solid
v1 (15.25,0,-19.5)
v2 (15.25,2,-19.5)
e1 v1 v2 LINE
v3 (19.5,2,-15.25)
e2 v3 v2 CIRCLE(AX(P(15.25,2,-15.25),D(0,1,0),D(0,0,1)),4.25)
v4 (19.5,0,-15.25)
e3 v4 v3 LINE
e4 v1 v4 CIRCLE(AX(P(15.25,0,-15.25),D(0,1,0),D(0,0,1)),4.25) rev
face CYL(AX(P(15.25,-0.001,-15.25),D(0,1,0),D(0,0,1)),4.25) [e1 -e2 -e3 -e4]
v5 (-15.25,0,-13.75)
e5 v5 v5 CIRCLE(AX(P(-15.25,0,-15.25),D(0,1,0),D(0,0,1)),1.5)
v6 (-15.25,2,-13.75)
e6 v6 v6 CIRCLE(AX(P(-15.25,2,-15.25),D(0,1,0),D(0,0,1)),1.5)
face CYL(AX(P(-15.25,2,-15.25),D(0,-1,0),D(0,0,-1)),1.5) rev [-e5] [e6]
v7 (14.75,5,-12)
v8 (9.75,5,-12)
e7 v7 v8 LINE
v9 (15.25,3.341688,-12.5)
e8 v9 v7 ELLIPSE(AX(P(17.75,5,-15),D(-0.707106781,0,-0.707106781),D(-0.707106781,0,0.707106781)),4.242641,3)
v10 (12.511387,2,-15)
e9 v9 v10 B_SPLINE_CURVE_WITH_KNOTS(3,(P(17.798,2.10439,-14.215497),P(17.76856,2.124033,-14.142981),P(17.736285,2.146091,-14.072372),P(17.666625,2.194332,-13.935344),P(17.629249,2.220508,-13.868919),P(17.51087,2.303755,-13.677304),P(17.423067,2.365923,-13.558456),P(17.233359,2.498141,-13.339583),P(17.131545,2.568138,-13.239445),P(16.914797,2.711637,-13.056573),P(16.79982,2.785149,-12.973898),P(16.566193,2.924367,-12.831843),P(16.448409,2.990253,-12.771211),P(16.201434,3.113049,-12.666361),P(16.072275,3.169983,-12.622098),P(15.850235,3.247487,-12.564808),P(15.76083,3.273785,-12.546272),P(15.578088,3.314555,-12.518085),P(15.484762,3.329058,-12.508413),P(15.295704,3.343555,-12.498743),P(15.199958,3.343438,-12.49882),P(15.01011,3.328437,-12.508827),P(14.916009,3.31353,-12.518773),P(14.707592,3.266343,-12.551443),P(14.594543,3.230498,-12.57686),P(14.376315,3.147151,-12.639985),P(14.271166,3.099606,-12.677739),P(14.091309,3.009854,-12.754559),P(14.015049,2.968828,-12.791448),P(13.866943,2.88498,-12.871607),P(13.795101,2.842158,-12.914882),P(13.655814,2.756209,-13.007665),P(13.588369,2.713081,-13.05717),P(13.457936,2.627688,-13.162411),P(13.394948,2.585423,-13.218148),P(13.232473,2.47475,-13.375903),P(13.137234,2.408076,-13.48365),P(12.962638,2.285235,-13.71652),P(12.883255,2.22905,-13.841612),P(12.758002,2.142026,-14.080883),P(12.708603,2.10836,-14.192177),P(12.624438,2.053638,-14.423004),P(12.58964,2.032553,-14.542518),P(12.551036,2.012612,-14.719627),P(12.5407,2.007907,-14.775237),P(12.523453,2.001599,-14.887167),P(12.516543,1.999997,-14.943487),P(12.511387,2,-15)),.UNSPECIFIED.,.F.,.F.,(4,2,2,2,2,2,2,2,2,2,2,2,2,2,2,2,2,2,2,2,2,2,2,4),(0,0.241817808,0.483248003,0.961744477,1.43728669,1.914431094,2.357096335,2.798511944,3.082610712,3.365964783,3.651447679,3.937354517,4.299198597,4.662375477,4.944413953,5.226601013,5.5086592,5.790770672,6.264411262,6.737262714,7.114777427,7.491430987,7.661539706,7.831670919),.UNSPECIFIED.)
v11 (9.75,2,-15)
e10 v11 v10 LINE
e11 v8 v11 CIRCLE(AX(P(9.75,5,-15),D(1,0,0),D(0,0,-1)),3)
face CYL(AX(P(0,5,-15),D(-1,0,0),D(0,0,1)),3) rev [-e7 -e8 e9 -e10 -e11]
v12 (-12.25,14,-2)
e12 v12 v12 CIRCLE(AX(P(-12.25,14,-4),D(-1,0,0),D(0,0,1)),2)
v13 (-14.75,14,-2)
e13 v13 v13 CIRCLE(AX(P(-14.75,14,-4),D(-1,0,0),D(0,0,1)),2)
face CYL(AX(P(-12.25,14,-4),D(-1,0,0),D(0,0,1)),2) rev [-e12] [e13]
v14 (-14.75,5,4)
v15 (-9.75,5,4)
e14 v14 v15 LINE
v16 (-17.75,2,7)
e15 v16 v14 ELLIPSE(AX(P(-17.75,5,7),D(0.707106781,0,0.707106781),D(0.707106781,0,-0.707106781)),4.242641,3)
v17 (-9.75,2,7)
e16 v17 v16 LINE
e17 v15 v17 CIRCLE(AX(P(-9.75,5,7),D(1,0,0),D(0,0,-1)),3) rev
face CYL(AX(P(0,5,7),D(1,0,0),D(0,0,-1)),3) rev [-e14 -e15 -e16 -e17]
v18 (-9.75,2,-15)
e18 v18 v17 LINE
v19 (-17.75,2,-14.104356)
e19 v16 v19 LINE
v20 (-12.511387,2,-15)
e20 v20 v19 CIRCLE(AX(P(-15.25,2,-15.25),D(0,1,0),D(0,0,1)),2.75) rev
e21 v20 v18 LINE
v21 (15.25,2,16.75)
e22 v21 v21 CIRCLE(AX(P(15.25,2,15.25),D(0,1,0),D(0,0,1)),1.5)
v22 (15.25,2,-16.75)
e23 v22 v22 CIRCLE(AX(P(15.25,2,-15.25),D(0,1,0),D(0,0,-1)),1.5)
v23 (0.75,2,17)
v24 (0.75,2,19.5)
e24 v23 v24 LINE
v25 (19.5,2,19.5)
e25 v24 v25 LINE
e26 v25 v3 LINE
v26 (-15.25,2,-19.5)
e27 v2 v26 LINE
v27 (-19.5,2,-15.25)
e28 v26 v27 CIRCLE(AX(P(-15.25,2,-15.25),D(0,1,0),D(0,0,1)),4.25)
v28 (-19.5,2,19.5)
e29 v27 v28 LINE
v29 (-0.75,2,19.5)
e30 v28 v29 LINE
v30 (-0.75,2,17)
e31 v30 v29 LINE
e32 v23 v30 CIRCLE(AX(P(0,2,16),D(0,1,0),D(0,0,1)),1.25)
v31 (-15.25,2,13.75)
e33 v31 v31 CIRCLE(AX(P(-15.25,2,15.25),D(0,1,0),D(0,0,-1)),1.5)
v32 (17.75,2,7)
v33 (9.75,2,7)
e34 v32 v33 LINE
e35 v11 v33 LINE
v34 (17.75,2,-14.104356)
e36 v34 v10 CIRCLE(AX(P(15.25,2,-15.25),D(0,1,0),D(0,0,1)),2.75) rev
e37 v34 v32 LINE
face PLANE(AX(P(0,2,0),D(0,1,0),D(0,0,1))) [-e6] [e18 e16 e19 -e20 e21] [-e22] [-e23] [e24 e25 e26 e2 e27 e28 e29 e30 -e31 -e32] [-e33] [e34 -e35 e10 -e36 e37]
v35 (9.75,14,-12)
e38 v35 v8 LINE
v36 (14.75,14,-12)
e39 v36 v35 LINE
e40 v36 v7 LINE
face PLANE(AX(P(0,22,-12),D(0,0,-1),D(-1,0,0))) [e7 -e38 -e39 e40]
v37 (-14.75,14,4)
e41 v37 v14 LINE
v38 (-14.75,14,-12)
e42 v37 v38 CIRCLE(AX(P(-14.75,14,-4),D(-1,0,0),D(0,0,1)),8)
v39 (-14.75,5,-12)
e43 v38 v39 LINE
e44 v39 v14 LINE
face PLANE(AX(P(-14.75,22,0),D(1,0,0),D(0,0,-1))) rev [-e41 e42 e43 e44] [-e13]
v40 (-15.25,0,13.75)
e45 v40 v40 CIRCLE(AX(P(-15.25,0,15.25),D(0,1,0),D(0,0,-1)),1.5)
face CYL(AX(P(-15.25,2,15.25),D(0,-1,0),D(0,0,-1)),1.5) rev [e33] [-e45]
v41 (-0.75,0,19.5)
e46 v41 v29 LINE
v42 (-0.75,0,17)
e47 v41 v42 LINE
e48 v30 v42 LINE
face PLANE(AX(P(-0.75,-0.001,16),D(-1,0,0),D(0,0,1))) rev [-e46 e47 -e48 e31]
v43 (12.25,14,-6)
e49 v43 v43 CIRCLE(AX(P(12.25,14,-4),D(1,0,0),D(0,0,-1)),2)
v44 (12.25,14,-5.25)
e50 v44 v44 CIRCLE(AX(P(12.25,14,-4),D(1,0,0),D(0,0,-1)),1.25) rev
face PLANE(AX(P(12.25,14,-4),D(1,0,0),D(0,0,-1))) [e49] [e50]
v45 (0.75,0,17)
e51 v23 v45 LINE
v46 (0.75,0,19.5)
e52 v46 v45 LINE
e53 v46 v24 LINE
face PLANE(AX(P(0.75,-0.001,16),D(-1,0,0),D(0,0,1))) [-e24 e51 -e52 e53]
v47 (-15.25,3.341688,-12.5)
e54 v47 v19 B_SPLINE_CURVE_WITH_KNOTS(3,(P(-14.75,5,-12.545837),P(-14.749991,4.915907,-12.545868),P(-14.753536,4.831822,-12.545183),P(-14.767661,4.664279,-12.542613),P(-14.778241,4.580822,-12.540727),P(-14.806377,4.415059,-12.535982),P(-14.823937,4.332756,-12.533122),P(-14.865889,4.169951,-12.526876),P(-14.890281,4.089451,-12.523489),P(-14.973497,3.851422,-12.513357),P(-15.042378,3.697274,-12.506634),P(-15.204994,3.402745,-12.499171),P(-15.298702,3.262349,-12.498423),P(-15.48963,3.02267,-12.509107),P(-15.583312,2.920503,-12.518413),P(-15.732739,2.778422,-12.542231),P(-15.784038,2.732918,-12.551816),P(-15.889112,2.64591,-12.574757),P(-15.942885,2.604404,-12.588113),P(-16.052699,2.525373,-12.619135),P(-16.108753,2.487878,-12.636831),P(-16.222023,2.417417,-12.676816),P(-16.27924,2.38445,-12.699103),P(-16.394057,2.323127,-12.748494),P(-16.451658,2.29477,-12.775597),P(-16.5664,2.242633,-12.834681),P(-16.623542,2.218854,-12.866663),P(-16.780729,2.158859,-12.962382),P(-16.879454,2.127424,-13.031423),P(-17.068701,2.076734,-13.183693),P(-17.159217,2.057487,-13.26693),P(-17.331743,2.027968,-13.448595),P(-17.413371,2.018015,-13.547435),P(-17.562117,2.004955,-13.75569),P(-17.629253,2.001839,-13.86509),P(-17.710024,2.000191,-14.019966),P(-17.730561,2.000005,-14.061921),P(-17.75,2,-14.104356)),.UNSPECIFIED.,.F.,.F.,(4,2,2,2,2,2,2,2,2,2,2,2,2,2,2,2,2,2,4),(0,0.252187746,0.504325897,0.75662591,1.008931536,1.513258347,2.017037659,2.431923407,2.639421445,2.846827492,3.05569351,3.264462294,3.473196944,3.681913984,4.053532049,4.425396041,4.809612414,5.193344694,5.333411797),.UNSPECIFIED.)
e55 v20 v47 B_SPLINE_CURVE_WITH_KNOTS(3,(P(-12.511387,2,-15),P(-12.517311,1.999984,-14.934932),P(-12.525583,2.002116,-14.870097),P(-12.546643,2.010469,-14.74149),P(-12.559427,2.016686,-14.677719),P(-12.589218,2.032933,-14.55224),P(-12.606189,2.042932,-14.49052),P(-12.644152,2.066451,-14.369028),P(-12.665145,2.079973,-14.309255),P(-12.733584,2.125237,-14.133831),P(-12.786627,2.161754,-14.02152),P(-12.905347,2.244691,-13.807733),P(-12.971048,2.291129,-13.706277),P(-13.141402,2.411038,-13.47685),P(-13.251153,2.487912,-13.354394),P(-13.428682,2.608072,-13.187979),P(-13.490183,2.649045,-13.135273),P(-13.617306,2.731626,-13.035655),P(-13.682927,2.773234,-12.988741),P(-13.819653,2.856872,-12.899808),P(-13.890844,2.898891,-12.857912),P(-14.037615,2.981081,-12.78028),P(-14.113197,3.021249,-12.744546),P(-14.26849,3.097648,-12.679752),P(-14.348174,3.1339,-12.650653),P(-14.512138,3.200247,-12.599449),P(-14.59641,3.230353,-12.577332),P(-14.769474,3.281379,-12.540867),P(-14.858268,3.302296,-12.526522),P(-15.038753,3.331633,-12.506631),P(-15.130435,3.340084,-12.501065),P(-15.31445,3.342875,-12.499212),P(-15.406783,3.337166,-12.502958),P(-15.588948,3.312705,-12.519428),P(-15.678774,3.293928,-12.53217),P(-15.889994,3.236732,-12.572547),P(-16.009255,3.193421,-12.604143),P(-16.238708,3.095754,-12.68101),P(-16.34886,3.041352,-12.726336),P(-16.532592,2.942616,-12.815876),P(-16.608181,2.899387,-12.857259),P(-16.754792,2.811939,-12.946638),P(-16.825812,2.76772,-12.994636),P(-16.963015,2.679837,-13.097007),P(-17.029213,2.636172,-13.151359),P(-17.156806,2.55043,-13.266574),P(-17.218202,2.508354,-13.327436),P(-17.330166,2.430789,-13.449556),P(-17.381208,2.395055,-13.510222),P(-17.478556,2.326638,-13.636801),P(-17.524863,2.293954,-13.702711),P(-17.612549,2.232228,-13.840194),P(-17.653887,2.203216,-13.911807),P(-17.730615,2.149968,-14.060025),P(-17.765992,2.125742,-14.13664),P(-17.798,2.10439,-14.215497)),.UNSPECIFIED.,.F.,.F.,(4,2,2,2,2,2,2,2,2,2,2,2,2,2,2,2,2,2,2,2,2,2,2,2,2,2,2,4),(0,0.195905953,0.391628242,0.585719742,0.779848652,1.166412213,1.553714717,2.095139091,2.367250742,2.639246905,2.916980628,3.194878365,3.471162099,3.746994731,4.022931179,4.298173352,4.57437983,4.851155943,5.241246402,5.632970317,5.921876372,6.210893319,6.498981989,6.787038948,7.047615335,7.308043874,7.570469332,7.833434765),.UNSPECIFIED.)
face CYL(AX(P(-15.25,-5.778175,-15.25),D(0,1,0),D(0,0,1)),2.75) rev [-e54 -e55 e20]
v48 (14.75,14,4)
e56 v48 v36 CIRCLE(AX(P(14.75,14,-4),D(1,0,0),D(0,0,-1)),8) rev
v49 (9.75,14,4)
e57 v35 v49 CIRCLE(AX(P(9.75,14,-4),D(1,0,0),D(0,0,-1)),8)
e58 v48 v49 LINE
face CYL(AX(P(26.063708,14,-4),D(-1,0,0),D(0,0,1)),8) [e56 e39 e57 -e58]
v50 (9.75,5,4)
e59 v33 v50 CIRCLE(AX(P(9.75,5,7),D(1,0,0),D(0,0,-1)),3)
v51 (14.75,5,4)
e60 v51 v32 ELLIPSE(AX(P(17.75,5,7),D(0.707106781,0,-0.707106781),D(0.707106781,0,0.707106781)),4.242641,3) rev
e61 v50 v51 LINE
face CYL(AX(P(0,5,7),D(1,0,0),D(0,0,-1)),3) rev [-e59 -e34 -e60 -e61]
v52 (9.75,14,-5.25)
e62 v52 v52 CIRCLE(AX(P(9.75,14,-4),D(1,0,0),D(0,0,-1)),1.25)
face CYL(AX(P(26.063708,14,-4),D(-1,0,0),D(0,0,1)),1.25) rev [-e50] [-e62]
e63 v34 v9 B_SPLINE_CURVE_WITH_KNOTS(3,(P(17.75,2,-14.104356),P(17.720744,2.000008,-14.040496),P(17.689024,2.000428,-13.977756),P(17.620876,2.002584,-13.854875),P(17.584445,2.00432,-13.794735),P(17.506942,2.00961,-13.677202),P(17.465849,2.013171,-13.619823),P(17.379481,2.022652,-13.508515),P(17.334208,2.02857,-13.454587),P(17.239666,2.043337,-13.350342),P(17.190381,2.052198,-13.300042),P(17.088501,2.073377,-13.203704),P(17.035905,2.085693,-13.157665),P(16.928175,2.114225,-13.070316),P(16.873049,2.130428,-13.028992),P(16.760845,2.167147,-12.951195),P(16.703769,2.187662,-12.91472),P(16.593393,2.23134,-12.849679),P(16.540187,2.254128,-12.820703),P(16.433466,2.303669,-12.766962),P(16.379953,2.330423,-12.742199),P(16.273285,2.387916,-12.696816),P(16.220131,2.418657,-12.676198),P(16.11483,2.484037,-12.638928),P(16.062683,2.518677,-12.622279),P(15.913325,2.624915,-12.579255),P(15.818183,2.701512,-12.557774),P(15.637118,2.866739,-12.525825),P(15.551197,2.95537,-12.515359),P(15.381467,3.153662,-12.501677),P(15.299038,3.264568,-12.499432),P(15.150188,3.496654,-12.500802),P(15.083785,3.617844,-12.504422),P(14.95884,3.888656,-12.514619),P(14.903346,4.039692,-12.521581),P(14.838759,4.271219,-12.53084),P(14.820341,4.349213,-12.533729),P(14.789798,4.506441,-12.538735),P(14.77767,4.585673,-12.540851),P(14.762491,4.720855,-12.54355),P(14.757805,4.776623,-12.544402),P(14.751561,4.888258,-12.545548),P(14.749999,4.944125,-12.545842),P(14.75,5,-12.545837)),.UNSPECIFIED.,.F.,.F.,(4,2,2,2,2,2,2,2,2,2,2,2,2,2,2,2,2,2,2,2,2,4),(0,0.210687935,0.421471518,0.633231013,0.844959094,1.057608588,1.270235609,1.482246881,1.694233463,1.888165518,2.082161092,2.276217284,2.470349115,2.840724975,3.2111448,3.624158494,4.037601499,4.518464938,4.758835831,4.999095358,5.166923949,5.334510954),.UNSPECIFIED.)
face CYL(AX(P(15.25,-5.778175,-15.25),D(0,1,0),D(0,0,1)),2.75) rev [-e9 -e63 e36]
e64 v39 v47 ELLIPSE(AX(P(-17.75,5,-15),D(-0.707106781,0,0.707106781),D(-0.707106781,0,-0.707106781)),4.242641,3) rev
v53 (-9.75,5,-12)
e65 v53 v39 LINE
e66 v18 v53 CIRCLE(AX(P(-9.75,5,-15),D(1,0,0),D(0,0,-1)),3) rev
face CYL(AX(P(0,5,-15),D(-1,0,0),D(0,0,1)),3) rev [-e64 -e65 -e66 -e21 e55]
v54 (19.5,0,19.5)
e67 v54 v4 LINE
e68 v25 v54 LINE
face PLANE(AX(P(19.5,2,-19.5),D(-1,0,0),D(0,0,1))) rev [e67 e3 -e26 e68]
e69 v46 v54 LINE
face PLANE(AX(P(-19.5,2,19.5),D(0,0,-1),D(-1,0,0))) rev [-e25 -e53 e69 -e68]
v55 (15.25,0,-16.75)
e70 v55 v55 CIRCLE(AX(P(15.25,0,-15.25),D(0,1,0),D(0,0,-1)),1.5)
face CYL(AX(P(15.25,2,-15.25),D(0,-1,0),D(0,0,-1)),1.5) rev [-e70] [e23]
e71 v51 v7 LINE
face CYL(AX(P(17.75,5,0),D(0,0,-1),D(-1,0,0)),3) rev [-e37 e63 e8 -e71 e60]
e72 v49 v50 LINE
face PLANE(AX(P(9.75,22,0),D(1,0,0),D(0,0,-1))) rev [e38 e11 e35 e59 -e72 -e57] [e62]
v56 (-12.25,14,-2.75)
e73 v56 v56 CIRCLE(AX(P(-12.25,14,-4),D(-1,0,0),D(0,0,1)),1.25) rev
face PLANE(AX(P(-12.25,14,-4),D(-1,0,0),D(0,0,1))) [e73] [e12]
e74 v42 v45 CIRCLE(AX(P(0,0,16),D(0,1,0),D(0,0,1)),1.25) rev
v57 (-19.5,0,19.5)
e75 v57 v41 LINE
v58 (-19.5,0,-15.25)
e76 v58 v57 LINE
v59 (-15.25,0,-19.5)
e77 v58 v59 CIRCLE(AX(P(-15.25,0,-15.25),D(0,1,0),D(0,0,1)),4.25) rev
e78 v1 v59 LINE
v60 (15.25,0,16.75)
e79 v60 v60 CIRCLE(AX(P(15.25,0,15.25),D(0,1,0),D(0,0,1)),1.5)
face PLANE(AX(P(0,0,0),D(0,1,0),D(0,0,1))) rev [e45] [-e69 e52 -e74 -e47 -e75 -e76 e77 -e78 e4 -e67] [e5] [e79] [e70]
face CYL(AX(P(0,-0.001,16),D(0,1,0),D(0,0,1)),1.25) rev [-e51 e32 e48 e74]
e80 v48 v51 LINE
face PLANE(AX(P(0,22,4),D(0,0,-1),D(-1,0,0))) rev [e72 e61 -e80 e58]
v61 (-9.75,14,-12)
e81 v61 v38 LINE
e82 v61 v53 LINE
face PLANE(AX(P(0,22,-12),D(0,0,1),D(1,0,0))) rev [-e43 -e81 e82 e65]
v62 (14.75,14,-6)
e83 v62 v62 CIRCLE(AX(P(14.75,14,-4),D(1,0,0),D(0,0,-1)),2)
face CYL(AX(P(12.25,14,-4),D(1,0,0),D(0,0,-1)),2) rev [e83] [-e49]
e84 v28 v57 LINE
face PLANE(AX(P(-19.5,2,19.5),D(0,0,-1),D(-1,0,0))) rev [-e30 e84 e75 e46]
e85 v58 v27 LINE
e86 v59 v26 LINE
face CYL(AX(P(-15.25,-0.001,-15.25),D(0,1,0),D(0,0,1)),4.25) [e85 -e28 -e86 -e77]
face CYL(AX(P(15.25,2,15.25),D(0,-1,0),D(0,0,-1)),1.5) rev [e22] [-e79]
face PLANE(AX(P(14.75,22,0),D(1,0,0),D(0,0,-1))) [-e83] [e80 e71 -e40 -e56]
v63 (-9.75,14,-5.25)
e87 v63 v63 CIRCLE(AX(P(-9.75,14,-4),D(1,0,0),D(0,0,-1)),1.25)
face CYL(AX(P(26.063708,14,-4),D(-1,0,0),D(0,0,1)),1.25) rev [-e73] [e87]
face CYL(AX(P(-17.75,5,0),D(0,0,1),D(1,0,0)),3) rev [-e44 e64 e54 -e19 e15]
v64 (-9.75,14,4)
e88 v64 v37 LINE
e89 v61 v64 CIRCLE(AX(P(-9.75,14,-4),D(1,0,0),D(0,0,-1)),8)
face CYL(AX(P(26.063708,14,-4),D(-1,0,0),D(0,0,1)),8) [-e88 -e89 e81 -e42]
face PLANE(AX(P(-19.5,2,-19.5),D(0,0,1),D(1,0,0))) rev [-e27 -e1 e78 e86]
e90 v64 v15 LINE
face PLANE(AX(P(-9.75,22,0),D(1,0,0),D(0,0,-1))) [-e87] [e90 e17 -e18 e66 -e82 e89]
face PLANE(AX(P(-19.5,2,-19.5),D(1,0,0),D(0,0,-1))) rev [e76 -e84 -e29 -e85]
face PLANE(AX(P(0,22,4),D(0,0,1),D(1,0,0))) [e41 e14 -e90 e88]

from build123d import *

# Parameters (mm, degrees)
SKETCH1_W           = 39
SKETCH1_H           = 39
SKETCH1_R           = 1.5
BOSS_EXTRUDE1_DEPTH = 2
SKETCH2_W           = 5
SKETCH2_H           = 16
BOSS_EXTRUDE2_DEPTH = 20
CUT_EXTRUDE1_REACH  = 47.137
SKETCH3_R           = 1.25
CUT_EXTRUDE2_REACH  = 36.066
SKETCH4_R           = 1.25
SKETCH4_W           = 1.5
SKETCH4_H           = 3.5
FILLET1_R           = 3
SKETCH6_R           = 2
CUT_EXTRUDE3_DEPTH  = 2.5
CUT_EXTRUDE4_START  = -2.5
SKETCH7_R           = 2
CUT_EXTRUDE4_DEPTH  = 2.5
SKETCH8_R           = 2.75
CUT_EXTRUDE5_DEPTH  = 20


with BuildPart() as part:
    # Sketch1 → Boss-Extrude1 (new body)
    with BuildSketch(Plane(origin=(0, 0, 0), x_dir=(1, 0, 0), z_dir=(0, 1, 0))):
        Rectangle(SKETCH1_W, SKETCH1_H)
        with Locations(Location((-15.25, 15.25, 0), (0, 0, 270))):
            Circle(SKETCH1_R, mode=Mode.SUBTRACT)
        with Locations(Location((15.25, 15.25, 0), (0, 0, 90))):
            Circle(SKETCH1_R, mode=Mode.SUBTRACT)
        with Locations(Location((15.25, -15.25, 0), (0, 0, 270))):
            Circle(SKETCH1_R, mode=Mode.SUBTRACT)
        with Locations(Location((-15.25, -15.25, 0), (0, 0, 90))):
            Circle(SKETCH1_R, mode=Mode.SUBTRACT)
    extrude(amount=BOSS_EXTRUDE1_DEPTH)

    # Sketch2 → Boss-Extrude2 (add)
    with BuildSketch(Plane(origin=(0, 2, 0), x_dir=(1, 0, 0), z_dir=(0, 1, 0))):
        with Locations((-12.25, 4)):
            Rectangle(SKETCH2_W, SKETCH2_H)
        with Locations((12.25, 4)):
            Rectangle(SKETCH2_W, SKETCH2_H)
    extrude(amount=BOSS_EXTRUDE2_DEPTH)

    # Cut-Extrude1: up to this face of the body (flat: up to its plane)
    cut_extrude1_end = Plane(part.part.faces().sort_by_distance((14.75, 12, -4))[0])
    # Sketch3 → Cut-Extrude1 (cut, up to the picked face)
    with BuildSketch(Plane.ZY.offset(14.75), mode=Mode.PRIVATE) as cut_extrude1_sk1:
        with BuildLine():
            Line((-12, 22), (-12, 14))
            ThreePointArc((-12, 14), (-9.656854249, 19.656854249), (-4, 22))
            Line((-4, 22), (-12, 22))
        make_face()
    cut_extrude1_tool1 = split(extrude(cut_extrude1_sk1.sketch, amount=-CUT_EXTRUDE1_REACH, mode=Mode.PRIVATE), bisect_by=cut_extrude1_end, keep=Keep.BOTH, mode=Mode.PRIVATE)
    # Sketch3 → Cut-Extrude1 (cut, up to the picked face)
    with BuildSketch(Plane.ZY.offset(14.75), mode=Mode.PRIVATE) as cut_extrude1_sk2:
        with BuildLine():
            ThreePointArc((-4, 22), (1.656854249, 19.656854249), (4, 14))
            Line((4, 14), (4, 22))
            Line((4, 22), (-4, 22))
        make_face()
    cut_extrude1_tool2 = split(extrude(cut_extrude1_sk2.sketch, amount=-CUT_EXTRUDE1_REACH, mode=Mode.PRIVATE), bisect_by=cut_extrude1_end, keep=Keep.BOTH, mode=Mode.PRIVATE)
    # Sketch3 → Cut-Extrude1 (cut, up to the picked face)
    with BuildSketch(Plane.ZY.offset(14.75), mode=Mode.PRIVATE) as cut_extrude1_sk3:
        with Locations(Location((-4, 14, 0), (0, 0, 180))):
            Circle(SKETCH3_R)
    cut_extrude1_tool3 = split(extrude(cut_extrude1_sk3.sketch, amount=-CUT_EXTRUDE1_REACH, mode=Mode.PRIVATE), bisect_by=cut_extrude1_end, keep=Keep.BOTH, mode=Mode.PRIVATE)
    add(cut_extrude1_tool1.solids().sort_by(Axis((-14.75, 20.213056, -10.213056), (1, 0, 0)))[0], mode=Mode.SUBTRACT)
    add(cut_extrude1_tool2.solids().sort_by(Axis((-14.75, 20.213056, 2.213056), (1, 0, 0)))[0], mode=Mode.SUBTRACT)
    add(cut_extrude1_tool3.solids().sort_by(Axis((-14.75, 14, -4), (1, 0, 0)))[0], mode=Mode.SUBTRACT)

    # Sketch4 → Cut-Extrude2 (cut, up to next)
    with BuildSketch(Plane(origin=(0, 2, 0), x_dir=(1, 0, 0), z_dir=(0, 1, 0)), mode=Mode.PRIVATE) as cut_extrude2_sk1:
        with BuildLine():
            Line((-19.5, 19.5), (-19.5, 15.25))
            ThreePointArc((-19.5, 15.25), (-18.25520382, 18.25520382), (-15.249999999, 19.5))
            Line((-15.249999999, 19.5), (-19.5, 19.5))
        make_face()
    cut_extrude2_tool1 = extrude(cut_extrude2_sk1.sketch, amount=-CUT_EXTRUDE2_REACH, mode=Mode.PRIVATE) & part.part
    # Sketch4 → Cut-Extrude2 (cut, up to next)
    with BuildSketch(Plane(origin=(0, 2, 0), x_dir=(1, 0, 0), z_dir=(0, 1, 0)), mode=Mode.PRIVATE) as cut_extrude2_sk2:
        with BuildLine():
            ThreePointArc((15.25, 19.5), (18.25520382, 18.25520382), (19.5, 15.25))
            Line((19.5, 15.25), (19.5, 19.5))
            Line((19.5, 19.5), (15.25, 19.5))
        make_face()
    cut_extrude2_tool2 = extrude(cut_extrude2_sk2.sketch, amount=-CUT_EXTRUDE2_REACH, mode=Mode.PRIVATE) & part.part
    # Sketch4 → Cut-Extrude2 (cut, up to next)
    with BuildSketch(Plane(origin=(0, 2, 0), x_dir=(1, 0, 0), z_dir=(0, 1, 0)), mode=Mode.PRIVATE) as cut_extrude2_sk3:
        with Locations((0, -16)):
            Circle(SKETCH4_R)
    cut_extrude2_tool3 = extrude(cut_extrude2_sk3.sketch, amount=-CUT_EXTRUDE2_REACH, mode=Mode.PRIVATE) & part.part
    # Sketch4 → Cut-Extrude2 (cut, up to next)
    with BuildSketch(Plane(origin=(0, 2, 0), x_dir=(1, 0, 0), z_dir=(0, 1, 0)), mode=Mode.PRIVATE) as cut_extrude2_sk4:
        with Locations((0, -17.75)):
            Rectangle(SKETCH4_W, SKETCH4_H)
    cut_extrude2_tool4 = extrude(cut_extrude2_sk4.sketch, amount=-CUT_EXTRUDE2_REACH, mode=Mode.PRIVATE) & part.part
    add(cut_extrude2_tool1.solids().sort_by_distance((-18.550686, 2, -18.550686))[0], mode=Mode.SUBTRACT)
    add(cut_extrude2_tool2.solids().sort_by_distance((18.550686, 2, -18.550686))[0], mode=Mode.SUBTRACT)
    add(cut_extrude2_tool3.solids().sort_by_distance((0, 2, 16))[0], mode=Mode.SUBTRACT)
    add(cut_extrude2_tool4.solids().sort_by_distance((0, 2, 17.75))[0], mode=Mode.SUBTRACT)

    # Fillet1
    # the kernel refuses this fillet: 3 mm, written as the material it adds along each edge
    with BuildSketch(Plane(origin=(-9.75, 2, -12), x_dir=(0, 0, -1), z_dir=(-1, 0, 0))) as fillet1_piece_1_section:
        with BuildLine():
            CenterArc((FILLET1_R, -FILLET1_R), FILLET1_R, 90, 90)
            Line((0, -FILLET1_R), (0, 0))
            Line((0, 0), (FILLET1_R, 0))
        make_face()
    fillet1_piece_1 = extrude(amount=5, mode=Mode.PRIVATE)
    fillet1_piece_1 = fillet1_piece_1 - Plane(origin=(-15.25, 2.68425546, -15.25), x_dir=(0, 0, 1), z_dir=(0, -1, 0)) * Cylinder(1.5, 23, mode=Mode.PRIVATE)
    add(fillet1_piece_1)
    with BuildSketch(Plane(origin=(-14.75, 2, -12), x_dir=(-1, 0, 0), z_dir=(0, 0, 1))) as fillet1_piece_2:
        with BuildLine():
            CenterArc((FILLET1_R, -FILLET1_R), FILLET1_R, 90, 90)
            Line((0, -FILLET1_R), (0, 0))
            Line((0, 0), (FILLET1_R, 0))
        make_face()
    extrude(amount=16)
    with BuildSketch(Plane(origin=(-14.75, 2, 4), x_dir=(0, 0, 1), z_dir=(1, 0, 0))) as fillet1_piece_3:
        with BuildLine():
            CenterArc((FILLET1_R, -FILLET1_R), FILLET1_R, 90, 90)
            Line((0, -FILLET1_R), (0, 0))
            Line((0, 0), (FILLET1_R, 0))
        make_face()
    extrude(amount=5)
    with BuildSketch(Plane(origin=(14.75, 2, 4), x_dir=(0, 0, 1), z_dir=(-1, 0, 0))) as fillet1_piece_4:
        with BuildLine():
            CenterArc((FILLET1_R, FILLET1_R), FILLET1_R, 180, 90)
            Line((0, FILLET1_R), (0, 0))
            Line((0, 0), (FILLET1_R, 0))
        make_face()
    extrude(amount=5)
    with BuildSketch(Plane(origin=(14.75, 2, -12), x_dir=(1, 0, 0), z_dir=(0, 0, 1))) as fillet1_piece_5:
        with BuildLine():
            CenterArc((FILLET1_R, FILLET1_R), FILLET1_R, 180, 90)
            Line((0, FILLET1_R), (0, 0))
            Line((0, 0), (FILLET1_R, 0))
        make_face()
    extrude(amount=16)
    with BuildSketch(Plane(origin=(9.75, 2, -12), x_dir=(0, 0, -1), z_dir=(1, 0, 0))) as fillet1_piece_6_section:
        with BuildLine():
            CenterArc((FILLET1_R, FILLET1_R), FILLET1_R, 180, 90)
            Line((0, FILLET1_R), (0, 0))
            Line((0, 0), (FILLET1_R, 0))
        make_face()
    fillet1_piece_6 = extrude(amount=5, mode=Mode.PRIVATE)
    fillet1_piece_6 = fillet1_piece_6 - Plane(origin=(15.25, 2.684255461, -15.25), x_dir=(0, 0, -1), z_dir=(0, -1, 0)) * Cylinder(1.5, 22, mode=Mode.PRIVATE)
    add(fillet1_piece_6)
    with BuildSketch(Plane(origin=(-9.75, 2, -12), x_dir=(0, 0, -1), z_dir=(-1, 0, 0))) as fillet1_piece_7a_section:
        with BuildLine():
            CenterArc((FILLET1_R, -FILLET1_R), FILLET1_R, 90, 90)
            Line((0, -FILLET1_R), (0, 0))
            Line((0, 0), (FILLET1_R, 0))
        make_face()
    fillet1_piece_7a = extrude(amount=12.5, mode=Mode.PRIVATE)
    fillet1_piece_7a = split(fillet1_piece_7a, bisect_by=Plane(origin=(-19.5, 2.695389127, -12.63970839), z_dir=(1, 0, 0)), keep=Keep.TOP, mode=Mode.PRIVATE)
    fillet1_piece_7a = fillet1_piece_7a - Plane(origin=(-15.25, 2.695389127, -15.25), x_dir=(0, 0, 1), z_dir=(0, -1, 0)) * Cylinder(1.5, 37, mode=Mode.PRIVATE)
    fillet1_piece_7a = split(fillet1_piece_7a, bisect_by=Plane(origin=(-14.75, 2.695389127, -12.63970839), z_dir=(-1, 0, 0)), keep=Keep.TOP, mode=Mode.PRIVATE)
    with BuildSketch(Plane(origin=(-14.75, 2, -19.5), x_dir=(-1, 0, 0), z_dir=(0, 0, 1))) as fillet1_piece_7b_section:
        with BuildLine():
            CenterArc((FILLET1_R, -FILLET1_R), FILLET1_R, 90, 90)
            Line((0, -FILLET1_R), (0, 0))
            Line((0, 0), (FILLET1_R, 0))
        make_face()
    fillet1_piece_7b = extrude(amount=23.5, mode=Mode.PRIVATE)
    fillet1_piece_7b = fillet1_piece_7b & Plane(origin=(-15.25, 2.080720084, -15.25), x_dir=(-1, 0, 0), z_dir=(0, 1, 0)) * Cylinder(4.25, 59, mode=Mode.PRIVATE)
    fillet1_piece_7b = fillet1_piece_7b - Plane(origin=(-15.25, 2.080720084, -15.25), x_dir=(0, 0, 1), z_dir=(0, -1, 0)) * Cylinder(1.5, 59, mode=Mode.PRIVATE)
    fillet1_piece_7b = split(fillet1_piece_7b, bisect_by=Plane(origin=(-16.967781304, 2.080720084, -12), z_dir=(0, 0, -1)), keep=Keep.TOP, mode=Mode.PRIVATE)
    fillet1_piece_7 = fillet1_piece_7a & fillet1_piece_7b
    add(fillet1_piece_7)
    with BuildSketch(Plane(origin=(-22.25, 2, 4), x_dir=(0, 0, 1), z_dir=(1, 0, 0))) as fillet1_piece_8a_section:
        with BuildLine():
            CenterArc((FILLET1_R, -FILLET1_R), FILLET1_R, 90, 90)
            Line((0, -FILLET1_R), (0, 0))
            Line((0, 0), (FILLET1_R, 0))
        make_face()
    fillet1_piece_8a = extrude(amount=12.5, mode=Mode.PRIVATE)
    fillet1_piece_8a = split(fillet1_piece_8a, bisect_by=Plane(origin=(-19.5, 2.679185343, 4.679185343), z_dir=(1, 0, 0)), keep=Keep.TOP, mode=Mode.PRIVATE)
    fillet1_piece_8a = split(fillet1_piece_8a, bisect_by=Plane(origin=(-14.75, 2.679185343, 4.679185343), z_dir=(-1, 0, 0)), keep=Keep.TOP, mode=Mode.PRIVATE)
    with BuildSketch(Plane(origin=(-14.75, 2, -12), x_dir=(-1, 0, 0), z_dir=(0, 0, 1))) as fillet1_piece_8b_section:
        with BuildLine():
            CenterArc((FILLET1_R, -FILLET1_R), FILLET1_R, 90, 90)
            Line((0, -FILLET1_R), (0, 0))
            Line((0, 0), (FILLET1_R, 0))
        make_face()
    fillet1_piece_8b = extrude(amount=23.5, mode=Mode.PRIVATE)
    fillet1_piece_8b = split(fillet1_piece_8b, bisect_by=Plane(origin=(-15.429185343, 2.679185343, 4), z_dir=(0, 0, 1)), keep=Keep.TOP, mode=Mode.PRIVATE)
    fillet1_piece_8 = fillet1_piece_8a & fillet1_piece_8b
    add(fillet1_piece_8)
    with BuildSketch(Plane(origin=(14.75, 2, -12), x_dir=(1, 0, 0), z_dir=(0, 0, 1))) as fillet1_piece_9a_section:
        with BuildLine():
            CenterArc((FILLET1_R, FILLET1_R), FILLET1_R, 180, 90)
            Line((0, FILLET1_R), (0, 0))
            Line((0, 0), (FILLET1_R, 0))
        make_face()
    fillet1_piece_9a = extrude(amount=23.5, mode=Mode.PRIVATE)
    fillet1_piece_9a = split(fillet1_piece_9a, bisect_by=Plane(origin=(15.429185343, 2.679185343, 4), z_dir=(0, 0, 1)), keep=Keep.TOP, mode=Mode.PRIVATE)
    with BuildSketch(Plane(origin=(22.25, 2, 4), x_dir=(0, 0, 1), z_dir=(-1, 0, 0))) as fillet1_piece_9b_section:
        with BuildLine():
            CenterArc((FILLET1_R, FILLET1_R), FILLET1_R, 180, 90)
            Line((0, FILLET1_R), (0, 0))
            Line((0, 0), (FILLET1_R, 0))
        make_face()
    fillet1_piece_9b = extrude(amount=12.5, mode=Mode.PRIVATE)
    fillet1_piece_9b = split(fillet1_piece_9b, bisect_by=Plane(origin=(19.5, 2.679185343, 4.679185343), z_dir=(-1, 0, 0)), keep=Keep.TOP, mode=Mode.PRIVATE)
    fillet1_piece_9b = split(fillet1_piece_9b, bisect_by=Plane(origin=(14.75, 2.679185343, 4.679185343), z_dir=(1, 0, 0)), keep=Keep.TOP, mode=Mode.PRIVATE)
    fillet1_piece_9 = fillet1_piece_9a & fillet1_piece_9b
    add(fillet1_piece_9)
    with BuildSketch(Plane(origin=(14.75, 2, -19.5), x_dir=(1, 0, 0), z_dir=(0, 0, 1))) as fillet1_piece_10a_section:
        with BuildLine():
            CenterArc((FILLET1_R, FILLET1_R), FILLET1_R, 180, 90)
            Line((0, FILLET1_R), (0, 0))
            Line((0, 0), (FILLET1_R, 0))
        make_face()
    fillet1_piece_10a = extrude(amount=23.5, mode=Mode.PRIVATE)
    fillet1_piece_10a = fillet1_piece_10a & Plane(origin=(15.25, 2.080720084, -15.25), x_dir=(0, 0, -1), z_dir=(0, 1, 0)) * Cylinder(4.25, 59, mode=Mode.PRIVATE)
    fillet1_piece_10a = fillet1_piece_10a - Plane(origin=(15.25, 2.080720084, -15.25), x_dir=(0, 0, -1), z_dir=(0, -1, 0)) * Cylinder(1.5, 59, mode=Mode.PRIVATE)
    fillet1_piece_10a = split(fillet1_piece_10a, bisect_by=Plane(origin=(16.967781304, 2.080720084, -12), z_dir=(0, 0, -1)), keep=Keep.TOP, mode=Mode.PRIVATE)
    with BuildSketch(Plane(origin=(9.75, 2, -12), x_dir=(0, 0, -1), z_dir=(1, 0, 0))) as fillet1_piece_10b_section:
        with BuildLine():
            CenterArc((FILLET1_R, FILLET1_R), FILLET1_R, 180, 90)
            Line((0, FILLET1_R), (0, 0))
            Line((0, 0), (FILLET1_R, 0))
        make_face()
    fillet1_piece_10b = extrude(amount=12.5, mode=Mode.PRIVATE)
    fillet1_piece_10b = split(fillet1_piece_10b, bisect_by=Plane(origin=(19.5, 2.695389122, -12.639708406), z_dir=(-1, 0, 0)), keep=Keep.TOP, mode=Mode.PRIVATE)
    fillet1_piece_10b = fillet1_piece_10b - Plane(origin=(15.25, 2.695389122, -15.25), x_dir=(0, 0, -1), z_dir=(0, -1, 0)) * Cylinder(1.5, 37, mode=Mode.PRIVATE)
    fillet1_piece_10b = split(fillet1_piece_10b, bisect_by=Plane(origin=(14.75, 2.695389122, -12.639708406), z_dir=(1, 0, 0)), keep=Keep.TOP, mode=Mode.PRIVATE)
    fillet1_piece_10 = fillet1_piece_10a & fillet1_piece_10b
    add(fillet1_piece_10)

    # Sketch6 → Cut-Extrude3 (cut)
    with BuildSketch(Plane.ZY.offset(14.75)):
        with Locations((-4, 14)):
            Circle(SKETCH6_R)
    extrude(amount=-CUT_EXTRUDE3_DEPTH, mode=Mode.SUBTRACT)

    # Sketch7 → Cut-Extrude4 (cut)
    with BuildSketch(Plane(origin=(14.75, 0, 0), x_dir=(0, 0, -1), z_dir=(1, 0, 0)).offset(CUT_EXTRUDE4_START)):
        with Locations(Location((4, 14, 0), (0, 0, 180))):
            Circle(SKETCH7_R)
    extrude(amount=CUT_EXTRUDE4_DEPTH, mode=Mode.SUBTRACT)

    # Sketch8 → Cut-Extrude5 (cut)
    with BuildSketch(Plane(origin=(0, 22, 0), x_dir=(1, 0, 0), z_dir=(0, 1, 0))):
        with Locations((-15.25, 15.25)):
            Circle(SKETCH8_R)
        with Locations((15.25, 15.25)):
            Circle(SKETCH8_R)
    extrude(amount=-CUT_EXTRUDE5_DEPTH, mode=Mode.SUBTRACT)


solid = part.part
